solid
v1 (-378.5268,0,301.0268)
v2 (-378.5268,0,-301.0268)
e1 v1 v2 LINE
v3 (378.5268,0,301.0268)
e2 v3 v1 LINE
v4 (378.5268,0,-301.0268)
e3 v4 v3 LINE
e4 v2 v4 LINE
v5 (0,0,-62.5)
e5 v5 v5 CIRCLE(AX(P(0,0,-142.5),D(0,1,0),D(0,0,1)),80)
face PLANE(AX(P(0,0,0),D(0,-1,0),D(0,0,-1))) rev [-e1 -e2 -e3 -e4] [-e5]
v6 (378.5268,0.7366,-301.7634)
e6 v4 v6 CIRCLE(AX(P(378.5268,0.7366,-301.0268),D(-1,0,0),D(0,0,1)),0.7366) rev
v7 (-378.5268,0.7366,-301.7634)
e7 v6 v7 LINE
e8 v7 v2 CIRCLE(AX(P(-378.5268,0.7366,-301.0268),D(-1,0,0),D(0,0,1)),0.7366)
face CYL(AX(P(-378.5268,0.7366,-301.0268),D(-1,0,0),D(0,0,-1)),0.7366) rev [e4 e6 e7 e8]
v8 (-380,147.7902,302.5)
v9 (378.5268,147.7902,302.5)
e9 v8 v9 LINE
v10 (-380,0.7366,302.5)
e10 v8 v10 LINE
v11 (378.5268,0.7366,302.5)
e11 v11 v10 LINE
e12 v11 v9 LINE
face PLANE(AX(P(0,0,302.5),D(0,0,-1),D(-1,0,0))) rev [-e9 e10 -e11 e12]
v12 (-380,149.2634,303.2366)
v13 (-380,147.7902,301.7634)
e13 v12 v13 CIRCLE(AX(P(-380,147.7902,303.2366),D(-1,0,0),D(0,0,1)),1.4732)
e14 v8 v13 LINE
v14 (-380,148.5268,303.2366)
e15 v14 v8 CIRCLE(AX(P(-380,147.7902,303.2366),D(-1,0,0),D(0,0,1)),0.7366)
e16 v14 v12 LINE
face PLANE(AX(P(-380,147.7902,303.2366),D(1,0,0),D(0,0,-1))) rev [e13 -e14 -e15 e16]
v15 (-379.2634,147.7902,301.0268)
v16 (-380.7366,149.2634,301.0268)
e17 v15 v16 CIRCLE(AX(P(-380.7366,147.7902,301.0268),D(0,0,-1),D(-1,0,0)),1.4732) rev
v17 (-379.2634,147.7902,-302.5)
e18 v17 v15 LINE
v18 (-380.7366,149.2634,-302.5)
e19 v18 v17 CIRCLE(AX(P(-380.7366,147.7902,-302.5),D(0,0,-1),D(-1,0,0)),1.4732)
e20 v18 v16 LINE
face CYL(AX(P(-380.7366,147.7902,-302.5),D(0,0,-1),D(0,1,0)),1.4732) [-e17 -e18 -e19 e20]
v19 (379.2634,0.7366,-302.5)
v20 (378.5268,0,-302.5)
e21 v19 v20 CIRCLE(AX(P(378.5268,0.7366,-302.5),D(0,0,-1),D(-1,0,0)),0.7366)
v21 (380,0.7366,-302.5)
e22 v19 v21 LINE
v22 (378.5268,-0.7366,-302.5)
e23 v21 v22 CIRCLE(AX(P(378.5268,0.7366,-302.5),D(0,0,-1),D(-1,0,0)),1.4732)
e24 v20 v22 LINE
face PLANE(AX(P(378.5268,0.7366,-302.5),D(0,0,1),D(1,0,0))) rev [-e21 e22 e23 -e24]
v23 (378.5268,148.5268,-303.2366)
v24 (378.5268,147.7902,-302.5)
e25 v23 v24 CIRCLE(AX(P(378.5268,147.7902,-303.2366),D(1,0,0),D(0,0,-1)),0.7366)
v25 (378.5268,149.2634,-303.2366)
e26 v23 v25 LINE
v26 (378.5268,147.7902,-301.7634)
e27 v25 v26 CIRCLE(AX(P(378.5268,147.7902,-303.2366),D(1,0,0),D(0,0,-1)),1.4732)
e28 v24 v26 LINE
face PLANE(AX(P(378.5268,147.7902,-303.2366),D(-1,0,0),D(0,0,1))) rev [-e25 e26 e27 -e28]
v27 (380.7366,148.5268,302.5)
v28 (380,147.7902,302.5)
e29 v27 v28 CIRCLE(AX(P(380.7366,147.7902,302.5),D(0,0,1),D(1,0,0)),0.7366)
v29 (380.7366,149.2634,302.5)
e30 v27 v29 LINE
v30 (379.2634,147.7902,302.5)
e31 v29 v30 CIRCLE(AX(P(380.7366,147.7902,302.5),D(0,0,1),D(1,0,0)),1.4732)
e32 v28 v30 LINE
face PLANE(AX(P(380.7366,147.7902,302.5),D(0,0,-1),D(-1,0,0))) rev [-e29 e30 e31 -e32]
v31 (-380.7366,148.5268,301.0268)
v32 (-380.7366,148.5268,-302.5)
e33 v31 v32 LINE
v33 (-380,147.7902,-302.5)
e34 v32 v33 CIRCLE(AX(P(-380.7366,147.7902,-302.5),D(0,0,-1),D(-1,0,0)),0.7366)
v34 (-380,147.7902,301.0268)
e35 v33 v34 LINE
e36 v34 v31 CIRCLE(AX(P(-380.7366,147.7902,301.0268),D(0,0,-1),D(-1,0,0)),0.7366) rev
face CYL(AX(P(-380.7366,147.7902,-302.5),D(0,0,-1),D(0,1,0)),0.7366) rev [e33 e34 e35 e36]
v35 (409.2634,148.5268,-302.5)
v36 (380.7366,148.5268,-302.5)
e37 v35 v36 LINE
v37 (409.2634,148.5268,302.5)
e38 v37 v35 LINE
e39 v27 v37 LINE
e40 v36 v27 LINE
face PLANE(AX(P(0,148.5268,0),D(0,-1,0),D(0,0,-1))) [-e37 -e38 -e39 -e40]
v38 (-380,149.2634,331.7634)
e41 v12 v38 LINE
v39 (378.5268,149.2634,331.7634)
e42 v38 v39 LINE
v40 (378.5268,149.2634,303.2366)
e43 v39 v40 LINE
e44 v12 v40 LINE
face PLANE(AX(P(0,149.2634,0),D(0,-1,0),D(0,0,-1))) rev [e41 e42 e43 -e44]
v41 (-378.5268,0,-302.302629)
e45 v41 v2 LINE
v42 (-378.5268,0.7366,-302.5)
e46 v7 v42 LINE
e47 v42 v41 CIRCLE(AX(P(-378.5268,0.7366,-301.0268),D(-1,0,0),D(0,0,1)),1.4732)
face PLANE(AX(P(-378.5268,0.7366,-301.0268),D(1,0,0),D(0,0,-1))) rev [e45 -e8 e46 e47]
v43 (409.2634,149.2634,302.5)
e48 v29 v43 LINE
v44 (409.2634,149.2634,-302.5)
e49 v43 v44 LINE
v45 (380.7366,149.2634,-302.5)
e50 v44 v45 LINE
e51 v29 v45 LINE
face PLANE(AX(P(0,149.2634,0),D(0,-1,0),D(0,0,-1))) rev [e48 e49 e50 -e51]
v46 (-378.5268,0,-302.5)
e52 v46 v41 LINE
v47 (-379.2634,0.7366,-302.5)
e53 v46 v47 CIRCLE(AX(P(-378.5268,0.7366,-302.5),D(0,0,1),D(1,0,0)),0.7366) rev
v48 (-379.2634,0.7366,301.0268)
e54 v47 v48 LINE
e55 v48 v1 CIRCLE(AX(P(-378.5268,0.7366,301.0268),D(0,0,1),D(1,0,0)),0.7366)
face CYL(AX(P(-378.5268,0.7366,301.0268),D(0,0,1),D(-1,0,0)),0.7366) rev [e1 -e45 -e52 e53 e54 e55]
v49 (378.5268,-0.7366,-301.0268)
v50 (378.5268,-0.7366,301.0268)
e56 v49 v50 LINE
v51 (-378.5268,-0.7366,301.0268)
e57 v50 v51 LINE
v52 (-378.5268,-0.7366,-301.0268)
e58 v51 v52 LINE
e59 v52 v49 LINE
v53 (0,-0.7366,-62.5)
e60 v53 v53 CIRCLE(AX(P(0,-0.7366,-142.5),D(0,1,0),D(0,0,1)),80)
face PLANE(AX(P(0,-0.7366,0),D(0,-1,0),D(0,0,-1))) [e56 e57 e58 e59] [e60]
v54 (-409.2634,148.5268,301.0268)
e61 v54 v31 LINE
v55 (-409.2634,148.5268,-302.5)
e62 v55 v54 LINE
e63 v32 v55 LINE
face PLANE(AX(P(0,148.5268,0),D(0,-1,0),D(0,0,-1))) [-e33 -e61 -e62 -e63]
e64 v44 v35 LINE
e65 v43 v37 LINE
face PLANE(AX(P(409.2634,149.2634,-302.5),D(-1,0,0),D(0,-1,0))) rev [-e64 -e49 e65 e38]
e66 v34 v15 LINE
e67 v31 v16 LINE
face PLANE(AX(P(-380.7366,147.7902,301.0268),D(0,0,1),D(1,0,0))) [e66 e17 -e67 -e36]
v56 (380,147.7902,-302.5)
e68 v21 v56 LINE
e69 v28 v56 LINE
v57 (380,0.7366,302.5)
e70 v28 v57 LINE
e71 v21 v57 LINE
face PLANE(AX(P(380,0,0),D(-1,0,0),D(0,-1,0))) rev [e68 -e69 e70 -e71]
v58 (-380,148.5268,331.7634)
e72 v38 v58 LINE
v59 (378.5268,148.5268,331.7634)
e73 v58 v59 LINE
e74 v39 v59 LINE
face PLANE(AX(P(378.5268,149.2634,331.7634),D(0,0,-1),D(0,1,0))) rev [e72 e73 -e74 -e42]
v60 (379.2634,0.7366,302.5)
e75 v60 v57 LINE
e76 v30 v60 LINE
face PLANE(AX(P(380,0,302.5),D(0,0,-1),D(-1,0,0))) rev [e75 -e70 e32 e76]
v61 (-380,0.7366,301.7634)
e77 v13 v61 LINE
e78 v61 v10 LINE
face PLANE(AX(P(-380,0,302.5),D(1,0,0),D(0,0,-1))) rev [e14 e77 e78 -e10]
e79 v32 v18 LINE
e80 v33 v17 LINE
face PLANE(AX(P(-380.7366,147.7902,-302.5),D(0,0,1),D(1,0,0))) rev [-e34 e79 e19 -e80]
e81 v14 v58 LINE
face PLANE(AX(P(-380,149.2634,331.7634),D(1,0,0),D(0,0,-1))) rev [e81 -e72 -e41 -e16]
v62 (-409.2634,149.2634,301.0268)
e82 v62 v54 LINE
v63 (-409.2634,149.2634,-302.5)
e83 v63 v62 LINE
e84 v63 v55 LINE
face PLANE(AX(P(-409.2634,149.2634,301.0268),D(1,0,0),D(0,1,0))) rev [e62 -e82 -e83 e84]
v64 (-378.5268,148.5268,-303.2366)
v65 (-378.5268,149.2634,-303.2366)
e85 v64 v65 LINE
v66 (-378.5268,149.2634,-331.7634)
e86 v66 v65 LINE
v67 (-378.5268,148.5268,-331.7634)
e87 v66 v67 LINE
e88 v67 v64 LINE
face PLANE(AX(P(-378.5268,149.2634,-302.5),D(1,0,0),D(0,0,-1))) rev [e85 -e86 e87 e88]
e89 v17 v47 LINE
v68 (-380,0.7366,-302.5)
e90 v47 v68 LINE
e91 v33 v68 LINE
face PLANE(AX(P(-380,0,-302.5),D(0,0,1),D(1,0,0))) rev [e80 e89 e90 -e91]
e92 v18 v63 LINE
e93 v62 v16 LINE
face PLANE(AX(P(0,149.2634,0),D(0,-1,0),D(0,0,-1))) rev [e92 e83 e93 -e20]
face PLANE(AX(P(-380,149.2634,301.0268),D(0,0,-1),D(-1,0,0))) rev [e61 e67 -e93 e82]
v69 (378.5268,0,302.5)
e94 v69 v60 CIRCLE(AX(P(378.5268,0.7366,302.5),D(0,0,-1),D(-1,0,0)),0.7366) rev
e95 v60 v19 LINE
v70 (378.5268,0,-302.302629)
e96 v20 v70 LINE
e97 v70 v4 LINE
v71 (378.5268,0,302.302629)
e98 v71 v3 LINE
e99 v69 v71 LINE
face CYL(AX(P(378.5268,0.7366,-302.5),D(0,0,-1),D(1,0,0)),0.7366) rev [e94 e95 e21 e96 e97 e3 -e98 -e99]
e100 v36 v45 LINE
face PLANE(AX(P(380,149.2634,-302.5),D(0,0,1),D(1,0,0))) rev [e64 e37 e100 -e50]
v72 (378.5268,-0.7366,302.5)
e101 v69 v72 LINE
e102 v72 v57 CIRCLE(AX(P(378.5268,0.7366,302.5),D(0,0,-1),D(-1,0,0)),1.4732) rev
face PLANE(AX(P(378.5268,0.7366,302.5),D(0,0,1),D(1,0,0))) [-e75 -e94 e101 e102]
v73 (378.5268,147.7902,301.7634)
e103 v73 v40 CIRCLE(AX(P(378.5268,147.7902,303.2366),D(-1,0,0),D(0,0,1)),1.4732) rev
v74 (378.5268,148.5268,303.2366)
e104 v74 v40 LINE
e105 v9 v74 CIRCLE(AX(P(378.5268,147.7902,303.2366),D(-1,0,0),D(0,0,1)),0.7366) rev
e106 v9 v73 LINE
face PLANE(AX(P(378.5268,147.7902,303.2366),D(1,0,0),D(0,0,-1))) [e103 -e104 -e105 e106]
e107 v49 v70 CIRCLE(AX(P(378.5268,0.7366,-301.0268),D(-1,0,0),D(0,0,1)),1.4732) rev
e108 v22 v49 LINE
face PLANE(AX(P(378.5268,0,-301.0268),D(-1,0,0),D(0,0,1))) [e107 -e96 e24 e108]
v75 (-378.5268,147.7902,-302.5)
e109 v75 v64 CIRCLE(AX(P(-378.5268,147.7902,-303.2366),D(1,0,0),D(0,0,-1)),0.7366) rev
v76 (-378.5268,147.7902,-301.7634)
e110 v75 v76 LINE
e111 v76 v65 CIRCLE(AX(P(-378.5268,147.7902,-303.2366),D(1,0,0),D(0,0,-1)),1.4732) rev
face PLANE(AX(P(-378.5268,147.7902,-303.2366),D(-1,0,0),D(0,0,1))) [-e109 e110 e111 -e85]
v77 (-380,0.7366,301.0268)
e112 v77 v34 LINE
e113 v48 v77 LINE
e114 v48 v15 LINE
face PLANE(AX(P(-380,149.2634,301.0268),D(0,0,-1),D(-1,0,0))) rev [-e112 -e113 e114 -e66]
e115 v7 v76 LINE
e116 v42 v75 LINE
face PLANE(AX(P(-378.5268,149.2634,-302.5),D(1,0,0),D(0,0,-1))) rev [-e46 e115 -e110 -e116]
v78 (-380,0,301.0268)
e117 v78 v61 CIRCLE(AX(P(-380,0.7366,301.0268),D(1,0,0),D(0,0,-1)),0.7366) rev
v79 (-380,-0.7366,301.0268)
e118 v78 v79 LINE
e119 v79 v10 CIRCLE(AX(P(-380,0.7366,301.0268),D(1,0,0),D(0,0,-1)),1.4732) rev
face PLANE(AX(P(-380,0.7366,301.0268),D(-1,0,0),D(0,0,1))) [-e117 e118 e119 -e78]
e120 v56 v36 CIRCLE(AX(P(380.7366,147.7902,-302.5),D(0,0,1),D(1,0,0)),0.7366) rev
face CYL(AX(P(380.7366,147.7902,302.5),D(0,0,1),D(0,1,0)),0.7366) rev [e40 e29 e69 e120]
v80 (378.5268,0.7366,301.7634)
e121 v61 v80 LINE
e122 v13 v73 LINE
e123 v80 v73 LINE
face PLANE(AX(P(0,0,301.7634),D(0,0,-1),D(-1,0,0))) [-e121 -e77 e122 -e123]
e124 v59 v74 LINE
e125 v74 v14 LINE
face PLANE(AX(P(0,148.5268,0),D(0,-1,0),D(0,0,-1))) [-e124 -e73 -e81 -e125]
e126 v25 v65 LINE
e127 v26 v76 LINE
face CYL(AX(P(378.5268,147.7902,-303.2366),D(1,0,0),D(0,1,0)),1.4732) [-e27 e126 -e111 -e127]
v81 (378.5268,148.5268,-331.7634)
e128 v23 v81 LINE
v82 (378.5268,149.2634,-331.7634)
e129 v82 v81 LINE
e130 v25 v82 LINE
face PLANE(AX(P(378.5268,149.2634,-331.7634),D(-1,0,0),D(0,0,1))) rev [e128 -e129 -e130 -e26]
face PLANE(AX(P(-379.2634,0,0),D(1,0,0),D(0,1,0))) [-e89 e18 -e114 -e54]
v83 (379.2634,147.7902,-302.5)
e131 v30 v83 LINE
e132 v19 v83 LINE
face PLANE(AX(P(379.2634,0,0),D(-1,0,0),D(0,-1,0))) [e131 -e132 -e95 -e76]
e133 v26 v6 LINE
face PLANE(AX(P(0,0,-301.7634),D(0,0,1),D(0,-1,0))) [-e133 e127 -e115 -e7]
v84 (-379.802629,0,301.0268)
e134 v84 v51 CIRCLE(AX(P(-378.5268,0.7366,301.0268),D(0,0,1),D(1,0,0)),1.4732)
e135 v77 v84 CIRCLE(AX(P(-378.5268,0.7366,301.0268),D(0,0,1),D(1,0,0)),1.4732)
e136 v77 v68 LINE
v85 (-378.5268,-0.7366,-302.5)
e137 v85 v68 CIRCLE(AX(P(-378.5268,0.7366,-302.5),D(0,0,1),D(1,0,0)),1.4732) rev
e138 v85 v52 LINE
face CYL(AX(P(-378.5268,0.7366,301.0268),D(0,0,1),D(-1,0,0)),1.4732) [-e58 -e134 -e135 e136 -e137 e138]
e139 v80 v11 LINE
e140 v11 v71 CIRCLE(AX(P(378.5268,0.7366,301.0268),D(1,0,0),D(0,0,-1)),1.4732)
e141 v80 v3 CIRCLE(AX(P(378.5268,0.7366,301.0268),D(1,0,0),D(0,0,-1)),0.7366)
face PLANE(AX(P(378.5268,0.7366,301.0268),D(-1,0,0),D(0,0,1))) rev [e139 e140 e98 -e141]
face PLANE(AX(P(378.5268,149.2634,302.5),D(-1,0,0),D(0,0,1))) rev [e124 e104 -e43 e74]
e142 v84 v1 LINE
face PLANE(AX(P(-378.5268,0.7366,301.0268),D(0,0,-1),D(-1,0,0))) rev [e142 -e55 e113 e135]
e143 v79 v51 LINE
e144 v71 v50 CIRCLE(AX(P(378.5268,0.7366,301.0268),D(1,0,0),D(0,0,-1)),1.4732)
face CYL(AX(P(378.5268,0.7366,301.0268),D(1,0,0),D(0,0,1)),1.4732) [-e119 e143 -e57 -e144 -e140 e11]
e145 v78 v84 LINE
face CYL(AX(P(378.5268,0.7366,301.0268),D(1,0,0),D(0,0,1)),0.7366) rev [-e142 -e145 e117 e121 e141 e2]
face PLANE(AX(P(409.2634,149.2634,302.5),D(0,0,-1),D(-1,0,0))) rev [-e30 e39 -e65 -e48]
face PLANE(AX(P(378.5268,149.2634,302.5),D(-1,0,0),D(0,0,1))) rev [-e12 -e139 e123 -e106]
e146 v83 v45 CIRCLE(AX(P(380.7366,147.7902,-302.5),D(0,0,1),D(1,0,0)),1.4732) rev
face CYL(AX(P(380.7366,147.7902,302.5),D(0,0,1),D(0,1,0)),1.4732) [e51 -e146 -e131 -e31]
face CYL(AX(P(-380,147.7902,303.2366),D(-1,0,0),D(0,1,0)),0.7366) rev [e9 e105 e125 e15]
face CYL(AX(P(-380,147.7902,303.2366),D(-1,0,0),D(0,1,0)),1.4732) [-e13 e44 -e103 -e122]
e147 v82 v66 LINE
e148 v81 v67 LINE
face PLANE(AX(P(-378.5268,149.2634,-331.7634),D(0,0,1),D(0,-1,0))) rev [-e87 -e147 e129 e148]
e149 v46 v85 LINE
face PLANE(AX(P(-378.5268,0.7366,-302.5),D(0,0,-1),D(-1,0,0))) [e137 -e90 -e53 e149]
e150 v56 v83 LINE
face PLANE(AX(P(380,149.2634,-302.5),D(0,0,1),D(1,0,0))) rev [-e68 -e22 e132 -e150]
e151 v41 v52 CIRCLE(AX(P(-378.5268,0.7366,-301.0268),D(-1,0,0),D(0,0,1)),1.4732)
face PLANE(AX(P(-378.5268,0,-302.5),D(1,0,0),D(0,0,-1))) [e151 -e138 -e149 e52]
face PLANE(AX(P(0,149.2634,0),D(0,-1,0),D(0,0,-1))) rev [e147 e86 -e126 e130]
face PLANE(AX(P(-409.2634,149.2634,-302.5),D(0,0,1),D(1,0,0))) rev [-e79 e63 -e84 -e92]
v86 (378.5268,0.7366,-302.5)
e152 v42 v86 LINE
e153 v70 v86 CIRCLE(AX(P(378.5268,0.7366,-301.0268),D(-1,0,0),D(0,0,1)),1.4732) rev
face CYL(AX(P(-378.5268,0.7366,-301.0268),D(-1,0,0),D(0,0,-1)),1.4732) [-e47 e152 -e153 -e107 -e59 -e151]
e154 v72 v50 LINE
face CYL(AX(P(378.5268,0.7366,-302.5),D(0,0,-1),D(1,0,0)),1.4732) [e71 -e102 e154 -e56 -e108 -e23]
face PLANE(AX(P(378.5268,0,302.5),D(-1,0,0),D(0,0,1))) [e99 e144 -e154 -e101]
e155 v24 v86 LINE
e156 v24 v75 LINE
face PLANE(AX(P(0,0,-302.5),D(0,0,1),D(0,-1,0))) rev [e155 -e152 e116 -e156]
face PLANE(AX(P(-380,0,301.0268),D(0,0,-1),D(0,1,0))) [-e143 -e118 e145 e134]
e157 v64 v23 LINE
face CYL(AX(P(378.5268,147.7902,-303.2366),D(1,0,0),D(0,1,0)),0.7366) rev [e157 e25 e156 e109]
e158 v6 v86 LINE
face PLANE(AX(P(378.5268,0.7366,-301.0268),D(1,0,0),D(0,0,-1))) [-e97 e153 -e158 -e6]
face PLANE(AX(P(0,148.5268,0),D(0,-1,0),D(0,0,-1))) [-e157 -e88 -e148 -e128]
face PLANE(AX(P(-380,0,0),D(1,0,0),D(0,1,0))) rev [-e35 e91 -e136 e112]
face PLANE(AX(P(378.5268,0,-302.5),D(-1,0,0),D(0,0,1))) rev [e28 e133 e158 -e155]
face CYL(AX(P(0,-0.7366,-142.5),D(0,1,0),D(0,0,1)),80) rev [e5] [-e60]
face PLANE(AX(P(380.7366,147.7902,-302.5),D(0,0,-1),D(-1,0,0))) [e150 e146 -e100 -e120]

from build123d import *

# Parameters (mm, degrees)
SKETCH1_W                    = 760
SKETCH1_H                    = 605
SKETCH1_R                    = 80
BASE_FLANGE1_DEPTH           = 0.7366
EDGE_FLANGE1_STRIP_W         = 4.4196
EDGE_FLANGE1_STRIP_H         = 0.7366
EDGE_FLANGE1_STRIP_CUT_DEPTH = 605
EDGE_FLANGE1_DEPTH           = 605
EDGE_FLANGE2_STRIP_W         = 4.4196
EDGE_FLANGE2_STRIP_H         = 0.7366
EDGE_FLANGE2_STRIP_CUT_DEPTH = 758.5268
EDGE_FLANGE2_DEPTH           = 758.5268
EDGE_FLANGE3_STRIP_W         = 4.4196
EDGE_FLANGE3_STRIP_H         = 0.7366
EDGE_FLANGE3_STRIP_CUT_DEPTH = 603.5268
EDGE_FLANGE3_DEPTH           = 603.5268
EDGE_FLANGE4_STRIP_W         = 4.4196
EDGE_FLANGE4_STRIP_H         = 0.7366
EDGE_FLANGE4_STRIP_CUT_DEPTH = 757.0536
EDGE_FLANGE4_DEPTH           = 757.0536
EDGE_FLANGE5_STRIP_W         = 4.4196
EDGE_FLANGE5_STRIP_H         = 0.7366
EDGE_FLANGE5_STRIP_CUT_DEPTH = 758.5268
EDGE_FLANGE5_DEPTH           = 758.5268
EDGE_FLANGE6_STRIP_W         = 4.4196
EDGE_FLANGE6_STRIP_H         = 0.7366
EDGE_FLANGE6_STRIP_CUT_DEPTH = 603.5268
EDGE_FLANGE6_DEPTH           = 603.5268
EDGE_FLANGE7_STRIP_W         = 4.4196
EDGE_FLANGE7_STRIP_H         = 0.7366
EDGE_FLANGE7_STRIP_CUT_DEPTH = 757.0536
EDGE_FLANGE7_DEPTH           = 757.0536
EDGE_FLANGE8_STRIP_W         = 4.4196
EDGE_FLANGE8_STRIP_H         = 0.7366
EDGE_FLANGE8_STRIP_CUT_DEPTH = 605
EDGE_FLANGE8_DEPTH           = 605


# Sheet-metal steps are written as plain solids
with BuildPart() as part:
    # Sketch1 → Base-Flange1 (new body)
    with BuildSketch(Plane(origin=(0, 0, 0), x_dir=(1, 0, 0), z_dir=(0, 1, 0))):
        Rectangle(SKETCH1_W, SKETCH1_H)
        with Locations(Location((0, 142.5, 0), (0, 0, 270))):
            Circle(SKETCH1_R, mode=Mode.SUBTRACT)
    extrude(amount=-BASE_FLANGE1_DEPTH)

    # Edge-Flange1 strip (across the edge) → Edge-Flange1 strip cut (cut)
    with BuildSketch(Plane(origin=(380, 0, 302.5), x_dir=(-1, 0, 0), z_dir=(0, 0, -1))):
        with Locations((-0.7366, -0.3683)):
            Rectangle(EDGE_FLANGE1_STRIP_W, EDGE_FLANGE1_STRIP_H)
    extrude(amount=EDGE_FLANGE1_STRIP_CUT_DEPTH, mode=Mode.SUBTRACT)

    # Edge-Flange1 section (across the edge) → Edge-Flange1 (add)
    with BuildSketch(Plane(origin=(380, 0, 302.5), x_dir=(-1, 0, 0), z_dir=(0, 0, -1))):
        with BuildLine():
            Line((0, 0.7366), (0, 149.2634))
            Line((0, 149.2634), (0.7366, 149.2634))
            Line((0.7366, 149.2634), (0.7366, 0.7366))
            ThreePointArc((0.7366, 0.7366), (0.952345145, 0.215745145), (1.4732, 0))
            Line((1.4732, 0), (1.4732, -0.7366))
            ThreePointArc((1.4732, -0.7366), (0.43149029, -0.30510971), (0, 0.7366))
        make_face()
    extrude(amount=EDGE_FLANGE1_DEPTH)

    # Edge-Flange2 strip (across the edge) → Edge-Flange2 strip cut (cut)
    with BuildSketch(Plane(origin=(-380, 0, 302.5), x_dir=(0, 0, -1), z_dir=(1, 0, 0))):
        with Locations((-0.7366, -0.3683)):
            Rectangle(EDGE_FLANGE2_STRIP_W, EDGE_FLANGE2_STRIP_H)
    extrude(amount=EDGE_FLANGE2_STRIP_CUT_DEPTH, mode=Mode.SUBTRACT)

    # Edge-Flange2 section (across the edge) → Edge-Flange2 (add)
    with BuildSketch(Plane(origin=(-380, 0, 302.5), x_dir=(0, 0, -1), z_dir=(1, 0, 0))):
        with BuildLine():
            Line((0, 0.7366), (0, 149.2634))
            Line((0, 149.2634), (0.7366, 149.2634))
            Line((0.7366, 149.2634), (0.7366, 0.7366))
            ThreePointArc((0.7366, 0.7366), (0.952345145, 0.215745145), (1.4732, 0))
            Line((1.4732, 0), (1.4732, -0.7366))
            ThreePointArc((1.4732, -0.7366), (0.43149029, -0.30510971), (0, 0.7366))
        make_face()
    extrude(amount=EDGE_FLANGE2_DEPTH)

    # Edge-Flange3 strip (across the edge) → Edge-Flange3 strip cut (cut)
    with BuildSketch(Plane(origin=(-380, 0, -302.5), x_dir=(1, 0, 0), z_dir=(0, 0, 1))):
        with Locations((-0.7366, -0.3683)):
            Rectangle(EDGE_FLANGE3_STRIP_W, EDGE_FLANGE3_STRIP_H)
    extrude(amount=EDGE_FLANGE3_STRIP_CUT_DEPTH, mode=Mode.SUBTRACT)

    # Edge-Flange3 section (across the edge) → Edge-Flange3 (add)
    with BuildSketch(Plane(origin=(-380, 0, -302.5), x_dir=(1, 0, 0), z_dir=(0, 0, 1))):
        with BuildLine():
            Line((0, 0.7366), (0, 149.2634))
            Line((0, 149.2634), (0.7366, 149.2634))
            Line((0.7366, 149.2634), (0.7366, 0.7366))
            ThreePointArc((0.7366, 0.7366), (0.952345145, 0.215745145), (1.4732, 0))
            Line((1.4732, 0), (1.4732, -0.7366))
            ThreePointArc((1.4732, -0.7366), (0.43149029, -0.30510971), (0, 0.7366))
        make_face()
    extrude(amount=EDGE_FLANGE3_DEPTH)

    # Edge-Flange4 strip (across the edge) → Edge-Flange4 strip cut (cut)
    with BuildSketch(Plane(origin=(378.5268, 0, -302.5), x_dir=(0, 0, 1), z_dir=(-1, 0, 0))):
        with Locations((-0.7366, -0.3683)):
            Rectangle(EDGE_FLANGE4_STRIP_W, EDGE_FLANGE4_STRIP_H)
    extrude(amount=EDGE_FLANGE4_STRIP_CUT_DEPTH, mode=Mode.SUBTRACT)

    # Edge-Flange4 section (across the edge) → Edge-Flange4 (add)
    with BuildSketch(Plane(origin=(378.5268, 0, -302.5), x_dir=(0, 0, 1), z_dir=(-1, 0, 0))):
        with BuildLine():
            Line((0, 0.7366), (0, 149.2634))
            Line((0, 149.2634), (0.7366, 149.2634))
            Line((0.7366, 149.2634), (0.7366, 0.7366))
            ThreePointArc((0.7366, 0.7366), (0.952345145, 0.215745145), (1.4732, 0))
            Line((1.4732, 0), (1.4732, -0.7366))
            ThreePointArc((1.4732, -0.7366), (0.43149029, -0.30510971), (0, 0.7366))
        make_face()
    extrude(amount=EDGE_FLANGE4_DEPTH)

    # Edge-Flange5 strip (across the edge) → Edge-Flange5 strip cut (cut)
    with BuildSketch(Plane(origin=(378.5268, 149.2634, 302.5), x_dir=(0, -1, 0), z_dir=(-1, 0, 0))):
        with Locations((-0.7366, -0.3683)):
            Rectangle(EDGE_FLANGE5_STRIP_W, EDGE_FLANGE5_STRIP_H)
    extrude(amount=EDGE_FLANGE5_STRIP_CUT_DEPTH, mode=Mode.SUBTRACT)

    # Edge-Flange5 section (across the edge) → Edge-Flange5 (add)
    with BuildSketch(Plane(origin=(378.5268, 149.2634, 302.5), x_dir=(0, -1, 0), z_dir=(-1, 0, 0))):
        with BuildLine():
            Line((0, 0.7366), (0, 29.2634))
            Line((0, 29.2634), (0.7366, 29.2634))
            Line((0.7366, 29.2634), (0.7366, 0.7366))
            ThreePointArc((0.7366, 0.7366), (0.952345145, 0.215745145), (1.4732, 0))
            Line((1.4732, 0), (1.4732, -0.7366))
            ThreePointArc((1.4732, -0.7366), (0.43149029, -0.30510971), (0, 0.7366))
        make_face()
    extrude(amount=EDGE_FLANGE5_DEPTH)

    # Edge-Flange6 strip (across the edge) → Edge-Flange6 strip cut (cut)
    with BuildSketch(Plane(origin=(-380, 149.2634, 301.0268), x_dir=(0, -1, 0), z_dir=(0, 0, -1))):
        with Locations((-0.7366, -0.3683)):
            Rectangle(EDGE_FLANGE6_STRIP_W, EDGE_FLANGE6_STRIP_H)
    extrude(amount=EDGE_FLANGE6_STRIP_CUT_DEPTH, mode=Mode.SUBTRACT)

    # Edge-Flange6 section (across the edge) → Edge-Flange6 (add)
    with BuildSketch(Plane(origin=(-380, 149.2634, 301.0268), x_dir=(0, -1, 0), z_dir=(0, 0, -1))):
        with BuildLine():
            Line((0, 0.7366), (0, 29.2634))
            Line((0, 29.2634), (0.7366, 29.2634))
            Line((0.7366, 29.2634), (0.7366, 0.7366))
            ThreePointArc((0.7366, 0.7366), (0.952345145, 0.215745145), (1.4732, 0))
            Line((1.4732, 0), (1.4732, -0.7366))
            ThreePointArc((1.4732, -0.7366), (0.43149029, -0.30510971), (0, 0.7366))
        make_face()
    extrude(amount=EDGE_FLANGE6_DEPTH)

    # Edge-Flange7 strip (across the edge) → Edge-Flange7 strip cut (cut)
    with BuildSketch(Plane(origin=(-378.5268, 149.2634, -302.5), x_dir=(0, -1, 0), z_dir=(1, 0, 0))):
        with Locations((-0.7366, -0.3683)):
            Rectangle(EDGE_FLANGE7_STRIP_W, EDGE_FLANGE7_STRIP_H)
    extrude(amount=EDGE_FLANGE7_STRIP_CUT_DEPTH, mode=Mode.SUBTRACT)

    # Edge-Flange7 section (across the edge) → Edge-Flange7 (add)
    with BuildSketch(Plane(origin=(-378.5268, 149.2634, -302.5), x_dir=(0, -1, 0), z_dir=(1, 0, 0))):
        with BuildLine():
            Line((0, 0.7366), (0, 29.2634))
            Line((0, 29.2634), (0.7366, 29.2634))
            Line((0.7366, 29.2634), (0.7366, 0.7366))
            ThreePointArc((0.7366, 0.7366), (0.952345145, 0.215745145), (1.4732, 0))
            Line((1.4732, 0), (1.4732, -0.7366))
            ThreePointArc((1.4732, -0.7366), (0.43149029, -0.30510971), (0, 0.7366))
        make_face()
    extrude(amount=EDGE_FLANGE7_DEPTH)

    # Edge-Flange8 strip (across the edge) → Edge-Flange8 strip cut (cut)
    with BuildSketch(Plane(origin=(380, 149.2634, -302.5), x_dir=(0, -1, 0), z_dir=(0, 0, 1))):
        with Locations((-0.7366, -0.3683)):
            Rectangle(EDGE_FLANGE8_STRIP_W, EDGE_FLANGE8_STRIP_H)
    extrude(amount=EDGE_FLANGE8_STRIP_CUT_DEPTH, mode=Mode.SUBTRACT)

    # Edge-Flange8 section (across the edge) → Edge-Flange8 (add)
    with BuildSketch(Plane(origin=(380, 149.2634, -302.5), x_dir=(0, -1, 0), z_dir=(0, 0, 1))):
        with BuildLine():
            Line((0, 0.7366), (0, 29.2634))
            Line((0, 29.2634), (0.7366, 29.2634))
            Line((0.7366, 29.2634), (0.7366, 0.7366))
            ThreePointArc((0.7366, 0.7366), (0.952345145, 0.215745145), (1.4732, 0))
            Line((1.4732, 0), (1.4732, -0.7366))
            ThreePointArc((1.4732, -0.7366), (0.43149029, -0.30510971), (0, 0.7366))
        make_face()
    extrude(amount=EDGE_FLANGE8_DEPTH)


solid = part.part
